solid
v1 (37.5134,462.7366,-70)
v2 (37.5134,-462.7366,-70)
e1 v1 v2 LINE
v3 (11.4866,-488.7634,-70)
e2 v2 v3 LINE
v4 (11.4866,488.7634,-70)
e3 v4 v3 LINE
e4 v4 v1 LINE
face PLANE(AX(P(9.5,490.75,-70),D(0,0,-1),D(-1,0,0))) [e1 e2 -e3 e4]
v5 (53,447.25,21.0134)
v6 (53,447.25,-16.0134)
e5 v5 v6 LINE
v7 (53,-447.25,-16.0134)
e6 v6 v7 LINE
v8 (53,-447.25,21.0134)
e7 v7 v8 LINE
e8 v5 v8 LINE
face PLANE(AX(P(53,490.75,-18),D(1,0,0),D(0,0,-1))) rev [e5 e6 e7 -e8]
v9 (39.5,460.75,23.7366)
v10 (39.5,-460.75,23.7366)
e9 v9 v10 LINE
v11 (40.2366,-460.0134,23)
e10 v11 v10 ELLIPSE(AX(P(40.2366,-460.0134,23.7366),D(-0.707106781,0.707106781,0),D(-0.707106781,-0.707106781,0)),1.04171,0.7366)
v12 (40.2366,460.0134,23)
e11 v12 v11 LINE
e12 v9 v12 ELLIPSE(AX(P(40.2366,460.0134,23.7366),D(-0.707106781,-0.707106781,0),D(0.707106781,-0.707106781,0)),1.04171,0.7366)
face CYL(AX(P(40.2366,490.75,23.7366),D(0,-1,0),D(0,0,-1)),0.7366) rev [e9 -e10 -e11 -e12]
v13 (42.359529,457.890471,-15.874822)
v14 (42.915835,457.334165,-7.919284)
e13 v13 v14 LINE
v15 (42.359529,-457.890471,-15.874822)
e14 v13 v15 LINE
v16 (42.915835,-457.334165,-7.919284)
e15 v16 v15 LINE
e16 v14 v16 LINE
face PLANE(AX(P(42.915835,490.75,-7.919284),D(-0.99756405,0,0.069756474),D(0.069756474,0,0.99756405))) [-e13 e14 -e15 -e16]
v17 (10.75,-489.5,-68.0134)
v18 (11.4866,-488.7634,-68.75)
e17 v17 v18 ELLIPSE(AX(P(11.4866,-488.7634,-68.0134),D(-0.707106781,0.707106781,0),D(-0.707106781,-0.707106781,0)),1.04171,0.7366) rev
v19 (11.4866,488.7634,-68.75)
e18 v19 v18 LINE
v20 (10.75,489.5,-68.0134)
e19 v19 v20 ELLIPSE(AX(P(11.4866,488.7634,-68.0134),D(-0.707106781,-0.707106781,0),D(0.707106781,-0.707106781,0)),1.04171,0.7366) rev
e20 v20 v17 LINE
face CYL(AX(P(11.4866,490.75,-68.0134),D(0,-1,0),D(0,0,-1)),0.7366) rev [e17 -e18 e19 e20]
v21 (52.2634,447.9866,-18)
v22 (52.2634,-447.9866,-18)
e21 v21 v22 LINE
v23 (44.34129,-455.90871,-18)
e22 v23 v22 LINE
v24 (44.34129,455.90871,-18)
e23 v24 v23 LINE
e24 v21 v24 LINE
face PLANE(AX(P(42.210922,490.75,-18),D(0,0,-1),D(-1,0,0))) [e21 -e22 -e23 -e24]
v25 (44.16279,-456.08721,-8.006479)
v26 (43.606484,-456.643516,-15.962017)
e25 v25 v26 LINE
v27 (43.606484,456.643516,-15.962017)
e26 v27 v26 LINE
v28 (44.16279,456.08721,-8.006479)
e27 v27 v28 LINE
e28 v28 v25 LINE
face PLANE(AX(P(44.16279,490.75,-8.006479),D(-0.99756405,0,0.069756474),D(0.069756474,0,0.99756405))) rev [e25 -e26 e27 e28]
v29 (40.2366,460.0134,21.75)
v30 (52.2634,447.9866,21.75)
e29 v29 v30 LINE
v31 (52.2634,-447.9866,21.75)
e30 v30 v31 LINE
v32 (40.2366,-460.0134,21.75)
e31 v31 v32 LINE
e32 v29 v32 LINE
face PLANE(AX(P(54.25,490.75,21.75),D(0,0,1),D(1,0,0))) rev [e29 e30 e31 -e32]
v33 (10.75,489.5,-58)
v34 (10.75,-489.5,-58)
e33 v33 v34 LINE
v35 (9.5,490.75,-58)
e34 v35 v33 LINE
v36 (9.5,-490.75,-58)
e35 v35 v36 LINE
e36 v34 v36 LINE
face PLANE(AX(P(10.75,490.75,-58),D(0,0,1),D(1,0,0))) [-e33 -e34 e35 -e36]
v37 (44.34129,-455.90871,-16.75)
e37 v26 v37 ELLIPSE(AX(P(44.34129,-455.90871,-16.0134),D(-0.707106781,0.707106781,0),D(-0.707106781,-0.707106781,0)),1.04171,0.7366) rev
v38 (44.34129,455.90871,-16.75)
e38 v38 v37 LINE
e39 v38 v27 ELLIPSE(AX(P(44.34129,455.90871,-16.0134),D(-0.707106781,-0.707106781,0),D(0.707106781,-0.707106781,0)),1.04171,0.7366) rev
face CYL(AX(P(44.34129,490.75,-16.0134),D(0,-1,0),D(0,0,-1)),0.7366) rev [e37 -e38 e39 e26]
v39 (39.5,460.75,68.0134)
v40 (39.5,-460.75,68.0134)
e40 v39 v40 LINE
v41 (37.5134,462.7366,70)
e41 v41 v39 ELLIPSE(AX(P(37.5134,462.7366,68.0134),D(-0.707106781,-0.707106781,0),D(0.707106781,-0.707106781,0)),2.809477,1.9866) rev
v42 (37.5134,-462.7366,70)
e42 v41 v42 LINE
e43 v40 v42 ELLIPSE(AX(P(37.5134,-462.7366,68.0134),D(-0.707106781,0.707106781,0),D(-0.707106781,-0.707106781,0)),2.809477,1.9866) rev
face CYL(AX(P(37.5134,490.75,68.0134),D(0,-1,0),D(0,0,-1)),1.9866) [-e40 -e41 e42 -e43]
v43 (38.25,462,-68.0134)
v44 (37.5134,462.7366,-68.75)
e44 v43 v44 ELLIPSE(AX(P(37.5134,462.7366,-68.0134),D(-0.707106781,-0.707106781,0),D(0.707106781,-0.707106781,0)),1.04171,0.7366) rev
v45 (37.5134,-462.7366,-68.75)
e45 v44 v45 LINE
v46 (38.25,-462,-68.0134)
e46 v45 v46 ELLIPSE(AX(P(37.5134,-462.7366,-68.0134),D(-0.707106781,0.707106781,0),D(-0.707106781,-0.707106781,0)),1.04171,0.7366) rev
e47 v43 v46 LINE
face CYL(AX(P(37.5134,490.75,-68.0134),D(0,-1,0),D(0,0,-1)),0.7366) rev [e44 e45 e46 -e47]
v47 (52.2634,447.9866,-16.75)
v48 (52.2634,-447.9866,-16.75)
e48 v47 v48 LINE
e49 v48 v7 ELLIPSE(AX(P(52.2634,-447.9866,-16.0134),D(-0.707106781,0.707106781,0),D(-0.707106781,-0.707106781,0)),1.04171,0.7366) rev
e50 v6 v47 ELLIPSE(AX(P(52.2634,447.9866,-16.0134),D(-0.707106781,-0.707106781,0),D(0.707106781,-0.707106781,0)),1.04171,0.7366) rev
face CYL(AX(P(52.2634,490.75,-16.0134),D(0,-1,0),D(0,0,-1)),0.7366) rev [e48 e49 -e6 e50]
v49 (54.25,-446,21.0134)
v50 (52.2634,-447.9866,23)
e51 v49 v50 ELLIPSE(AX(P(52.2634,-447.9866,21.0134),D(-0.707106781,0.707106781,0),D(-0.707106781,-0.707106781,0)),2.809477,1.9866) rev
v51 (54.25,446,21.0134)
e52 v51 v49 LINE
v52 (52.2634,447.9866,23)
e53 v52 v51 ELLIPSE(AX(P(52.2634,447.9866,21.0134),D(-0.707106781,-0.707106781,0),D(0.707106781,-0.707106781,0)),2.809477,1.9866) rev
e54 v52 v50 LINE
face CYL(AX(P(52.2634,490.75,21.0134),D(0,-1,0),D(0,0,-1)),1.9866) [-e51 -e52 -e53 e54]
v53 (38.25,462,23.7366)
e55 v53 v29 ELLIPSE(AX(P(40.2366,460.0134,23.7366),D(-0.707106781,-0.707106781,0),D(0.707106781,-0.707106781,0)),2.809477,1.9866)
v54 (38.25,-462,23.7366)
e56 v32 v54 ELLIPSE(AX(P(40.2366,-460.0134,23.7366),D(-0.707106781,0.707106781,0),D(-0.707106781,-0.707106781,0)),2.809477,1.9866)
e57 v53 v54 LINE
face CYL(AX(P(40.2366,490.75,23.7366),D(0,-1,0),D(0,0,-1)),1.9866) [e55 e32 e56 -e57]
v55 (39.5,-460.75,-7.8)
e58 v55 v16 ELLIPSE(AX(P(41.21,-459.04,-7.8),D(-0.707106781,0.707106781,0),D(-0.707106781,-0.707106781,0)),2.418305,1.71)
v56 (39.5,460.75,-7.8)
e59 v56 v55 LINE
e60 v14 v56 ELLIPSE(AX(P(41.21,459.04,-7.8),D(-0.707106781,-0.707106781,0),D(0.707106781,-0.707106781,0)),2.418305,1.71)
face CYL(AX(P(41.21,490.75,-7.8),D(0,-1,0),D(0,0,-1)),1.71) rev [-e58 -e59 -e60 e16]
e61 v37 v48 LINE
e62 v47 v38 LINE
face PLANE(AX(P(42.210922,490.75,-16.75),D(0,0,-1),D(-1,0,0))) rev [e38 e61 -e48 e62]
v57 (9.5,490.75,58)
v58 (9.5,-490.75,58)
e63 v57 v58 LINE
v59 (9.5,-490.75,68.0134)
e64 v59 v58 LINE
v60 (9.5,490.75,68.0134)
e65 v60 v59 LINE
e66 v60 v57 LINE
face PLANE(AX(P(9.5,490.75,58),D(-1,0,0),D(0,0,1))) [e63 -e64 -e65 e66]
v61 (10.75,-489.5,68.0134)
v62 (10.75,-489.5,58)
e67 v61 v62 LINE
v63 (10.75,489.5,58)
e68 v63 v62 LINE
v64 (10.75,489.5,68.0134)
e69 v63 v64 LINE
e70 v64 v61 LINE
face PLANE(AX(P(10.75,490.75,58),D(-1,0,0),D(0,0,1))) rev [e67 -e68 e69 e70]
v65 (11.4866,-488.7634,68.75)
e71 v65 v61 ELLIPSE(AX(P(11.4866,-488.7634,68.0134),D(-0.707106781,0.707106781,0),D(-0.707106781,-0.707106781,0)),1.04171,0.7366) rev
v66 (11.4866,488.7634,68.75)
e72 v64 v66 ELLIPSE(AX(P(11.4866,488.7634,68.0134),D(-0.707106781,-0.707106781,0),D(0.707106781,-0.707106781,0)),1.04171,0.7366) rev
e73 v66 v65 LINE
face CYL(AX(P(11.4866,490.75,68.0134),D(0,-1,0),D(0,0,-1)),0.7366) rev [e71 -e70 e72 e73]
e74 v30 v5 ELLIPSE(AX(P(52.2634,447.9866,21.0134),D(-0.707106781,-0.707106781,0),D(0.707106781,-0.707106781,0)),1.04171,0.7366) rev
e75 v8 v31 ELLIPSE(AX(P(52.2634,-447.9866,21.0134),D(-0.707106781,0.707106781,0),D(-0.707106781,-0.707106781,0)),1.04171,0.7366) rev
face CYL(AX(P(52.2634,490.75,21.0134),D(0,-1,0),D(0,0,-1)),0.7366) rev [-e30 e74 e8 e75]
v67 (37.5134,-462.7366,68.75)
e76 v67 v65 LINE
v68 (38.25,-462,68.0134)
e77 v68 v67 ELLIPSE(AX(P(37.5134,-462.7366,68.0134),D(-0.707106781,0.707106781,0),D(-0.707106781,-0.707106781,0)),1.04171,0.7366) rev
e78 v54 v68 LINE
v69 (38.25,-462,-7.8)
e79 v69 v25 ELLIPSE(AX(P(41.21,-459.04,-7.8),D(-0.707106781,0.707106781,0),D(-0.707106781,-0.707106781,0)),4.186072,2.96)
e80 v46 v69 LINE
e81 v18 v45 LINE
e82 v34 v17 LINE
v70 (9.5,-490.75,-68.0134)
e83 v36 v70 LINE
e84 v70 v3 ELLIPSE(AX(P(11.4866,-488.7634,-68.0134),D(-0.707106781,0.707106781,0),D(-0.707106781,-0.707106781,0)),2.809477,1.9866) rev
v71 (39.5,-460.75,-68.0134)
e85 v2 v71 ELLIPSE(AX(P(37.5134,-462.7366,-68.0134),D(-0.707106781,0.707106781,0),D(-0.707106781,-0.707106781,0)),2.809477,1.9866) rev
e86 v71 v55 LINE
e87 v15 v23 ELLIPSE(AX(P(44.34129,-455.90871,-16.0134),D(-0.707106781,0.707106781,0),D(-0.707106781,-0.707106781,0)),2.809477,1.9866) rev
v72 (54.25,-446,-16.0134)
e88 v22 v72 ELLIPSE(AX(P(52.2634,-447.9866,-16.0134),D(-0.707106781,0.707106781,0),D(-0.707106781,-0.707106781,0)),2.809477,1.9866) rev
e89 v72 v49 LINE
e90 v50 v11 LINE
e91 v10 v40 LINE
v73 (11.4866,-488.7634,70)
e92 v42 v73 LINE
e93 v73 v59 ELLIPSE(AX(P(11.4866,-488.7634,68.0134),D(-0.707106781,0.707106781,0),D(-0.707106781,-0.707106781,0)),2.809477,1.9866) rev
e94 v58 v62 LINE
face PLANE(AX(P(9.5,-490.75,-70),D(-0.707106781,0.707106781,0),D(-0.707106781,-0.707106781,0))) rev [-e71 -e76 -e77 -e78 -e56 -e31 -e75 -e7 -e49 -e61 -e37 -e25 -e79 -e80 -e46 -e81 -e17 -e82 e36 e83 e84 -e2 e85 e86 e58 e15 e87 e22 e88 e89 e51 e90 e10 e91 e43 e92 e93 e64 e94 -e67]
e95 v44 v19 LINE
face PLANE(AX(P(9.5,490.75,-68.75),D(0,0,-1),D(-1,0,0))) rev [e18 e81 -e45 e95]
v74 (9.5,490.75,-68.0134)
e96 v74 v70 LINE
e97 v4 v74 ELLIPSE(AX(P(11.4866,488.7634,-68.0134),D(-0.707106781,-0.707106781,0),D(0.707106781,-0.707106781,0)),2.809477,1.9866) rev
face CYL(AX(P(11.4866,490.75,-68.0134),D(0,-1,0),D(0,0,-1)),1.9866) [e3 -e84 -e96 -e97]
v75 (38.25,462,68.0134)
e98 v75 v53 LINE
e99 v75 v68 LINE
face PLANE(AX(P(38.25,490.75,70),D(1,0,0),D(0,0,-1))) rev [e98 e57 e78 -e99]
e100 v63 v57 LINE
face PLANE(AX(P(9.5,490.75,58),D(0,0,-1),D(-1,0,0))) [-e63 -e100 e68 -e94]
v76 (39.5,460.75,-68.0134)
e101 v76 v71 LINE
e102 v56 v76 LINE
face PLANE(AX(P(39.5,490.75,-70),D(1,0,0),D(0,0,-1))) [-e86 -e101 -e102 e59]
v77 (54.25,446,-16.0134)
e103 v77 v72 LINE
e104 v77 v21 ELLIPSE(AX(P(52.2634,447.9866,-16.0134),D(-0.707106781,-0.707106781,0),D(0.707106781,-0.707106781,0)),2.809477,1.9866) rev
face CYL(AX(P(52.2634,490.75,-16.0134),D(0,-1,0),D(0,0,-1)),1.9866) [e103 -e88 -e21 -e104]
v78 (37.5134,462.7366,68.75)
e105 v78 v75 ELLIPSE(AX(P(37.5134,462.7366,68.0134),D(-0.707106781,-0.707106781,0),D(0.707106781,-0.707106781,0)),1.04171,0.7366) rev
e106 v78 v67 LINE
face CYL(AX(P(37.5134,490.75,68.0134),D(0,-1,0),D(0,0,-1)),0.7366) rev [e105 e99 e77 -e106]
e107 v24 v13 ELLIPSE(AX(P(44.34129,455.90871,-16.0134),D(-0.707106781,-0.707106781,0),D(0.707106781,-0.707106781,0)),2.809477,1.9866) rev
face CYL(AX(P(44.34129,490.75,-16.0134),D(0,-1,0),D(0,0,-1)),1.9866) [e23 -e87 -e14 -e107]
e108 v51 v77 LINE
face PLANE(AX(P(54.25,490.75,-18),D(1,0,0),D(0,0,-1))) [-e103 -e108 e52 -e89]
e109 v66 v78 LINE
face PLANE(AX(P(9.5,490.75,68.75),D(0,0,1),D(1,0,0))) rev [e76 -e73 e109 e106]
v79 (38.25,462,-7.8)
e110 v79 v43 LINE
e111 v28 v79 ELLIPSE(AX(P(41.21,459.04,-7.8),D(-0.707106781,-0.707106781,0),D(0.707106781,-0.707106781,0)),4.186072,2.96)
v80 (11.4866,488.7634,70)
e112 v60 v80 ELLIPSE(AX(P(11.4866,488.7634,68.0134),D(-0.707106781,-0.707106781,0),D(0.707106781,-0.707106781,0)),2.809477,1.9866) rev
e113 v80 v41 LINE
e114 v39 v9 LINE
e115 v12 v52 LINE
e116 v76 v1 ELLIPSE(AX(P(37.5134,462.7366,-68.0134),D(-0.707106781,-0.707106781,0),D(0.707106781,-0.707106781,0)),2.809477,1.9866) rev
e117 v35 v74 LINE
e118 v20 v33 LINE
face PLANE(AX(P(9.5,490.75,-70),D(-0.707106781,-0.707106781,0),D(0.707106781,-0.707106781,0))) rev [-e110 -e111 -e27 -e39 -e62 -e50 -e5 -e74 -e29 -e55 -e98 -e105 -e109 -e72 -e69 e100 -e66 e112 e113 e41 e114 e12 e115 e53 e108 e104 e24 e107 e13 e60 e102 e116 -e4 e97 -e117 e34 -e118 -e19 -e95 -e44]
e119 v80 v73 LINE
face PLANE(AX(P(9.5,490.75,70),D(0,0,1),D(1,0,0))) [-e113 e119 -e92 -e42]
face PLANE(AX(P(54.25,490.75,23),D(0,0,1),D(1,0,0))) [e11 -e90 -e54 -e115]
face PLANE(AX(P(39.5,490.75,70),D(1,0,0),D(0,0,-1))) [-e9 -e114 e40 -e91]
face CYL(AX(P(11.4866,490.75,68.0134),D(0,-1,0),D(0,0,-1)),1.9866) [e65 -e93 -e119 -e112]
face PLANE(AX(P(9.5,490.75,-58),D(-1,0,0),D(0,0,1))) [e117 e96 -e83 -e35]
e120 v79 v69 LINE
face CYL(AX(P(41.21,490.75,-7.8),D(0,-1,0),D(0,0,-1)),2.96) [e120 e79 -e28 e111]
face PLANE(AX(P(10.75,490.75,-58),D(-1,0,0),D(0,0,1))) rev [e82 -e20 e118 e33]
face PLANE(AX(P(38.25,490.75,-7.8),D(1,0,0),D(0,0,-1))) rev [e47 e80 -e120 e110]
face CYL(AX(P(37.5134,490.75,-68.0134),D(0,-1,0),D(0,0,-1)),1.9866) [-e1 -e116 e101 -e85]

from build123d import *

# Parameters (mm, degrees)
BASE_FLANGE1_DEPTH = 490.75
CUT_EXTRUDE2_DEPTH = 514.204272196


# Sheet-metal steps are written as plain solids
with BuildPart() as part:
    # Sketch1 → Base-Flange1 (new, symmetric)
    with BuildSketch(Plane(origin=(0, 0, 0), x_dir=(1, 0, 0), z_dir=(0, 1, 0))):
        with BuildLine():
            Line((9.5, 58), (9.5, 68.0134))
            ThreePointArc((9.5, 68.0134), (10.081861668, 69.418138332), (11.4866, 70))
            Line((11.4866, 70), (37.5134, 70))
            ThreePointArc((37.5134, 70), (38.918138332, 69.418138332), (39.5, 68.0134))
            Line((39.5, 68.0134), (39.5, 23))
            Line((39.5, 23), (39.5, 18))
            Line((39.5, 18), (39.5, 7.8))
            ThreePointArc((39.5, 7.8), (41.269678139, 6.091041686), (42.915834526, 7.91928357))
            Line((42.915834526, 7.91928357), (42.359529101, 15.874821789))
            ThreePointArc((42.359529101, 15.874821789), (42.88838258, 17.368257942), (44.341289843, 18))
            Line((44.341289843, 18), (52.2634, 18))
            ThreePointArc((52.2634, 18), (53.668138332, 17.418138332), (54.25, 16.0134))
            Line((54.25, 16.0134), (54.25, -21.0134))
            ThreePointArc((54.25, -21.0134), (53.668138332, -22.418138332), (52.2634, -23))
            Line((52.2634, -23), (40.2366, -23))
            ThreePointArc((40.2366, -23), (39.715745145, -23.215745145), (39.5, -23.7366))
            Line((39.5, -23.7366), (39.5, -68.0134))
            ThreePointArc((39.5, -68.0134), (38.918138332, -69.418138332), (37.5134, -70))
            Line((37.5134, -70), (11.4866, -70))
            ThreePointArc((11.4866, -70), (10.081861668, -69.418138332), (9.5, -68.0134))
            Line((9.5, -68.0134), (9.5, -58))
            Line((9.5, -58), (10.75, -58))
            Line((10.75, -58), (10.75, -68.0134))
            ThreePointArc((10.75, -68.0134), (10.965745145, -68.534254855), (11.4866, -68.75))
            Line((11.4866, -68.75), (37.5134, -68.75))
            ThreePointArc((37.5134, -68.75), (38.034254855, -68.534254855), (38.25, -68.0134))
            Line((38.25, -68.0134), (38.25, -23.7366))
            ThreePointArc((38.25, -23.7366), (38.831861668, -22.331861668), (40.2366, -21.75))
            Line((40.2366, -21.75), (52.2634, -21.75))
            ThreePointArc((52.2634, -21.75), (52.784254855, -21.534254855), (53, -21.0134))
            Line((53, -21.0134), (53, 16.0134))
            ThreePointArc((53, 16.0134), (52.784254855, 16.534254855), (52.2634, 16.75))
            Line((52.2634, 16.75), (44.341289843, 16.75))
            ThreePointArc((44.341289843, 16.75), (43.802574707, 16.515759992), (43.606484164, 15.962017381))
            Line((43.606484164, 15.962017381), (44.162789589, 8.006479162))
            ThreePointArc((44.162789589, 8.006479162), (41.31330251, 4.841803152), (38.25, 7.8))
            Line((38.25, 7.8), (38.25, 18))
            Line((38.25, 18), (38.25, 23))
            Line((38.25, 23), (38.25, 68.0134))
            ThreePointArc((38.25, 68.0134), (38.034254855, 68.534254855), (37.5134, 68.75))
            Line((37.5134, 68.75), (11.4866, 68.75))
            ThreePointArc((11.4866, 68.75), (10.965745145, 68.534254855), (10.75, 68.0134))
            Line((10.75, 68.0134), (10.75, 58))
            Line((10.75, 58), (9.5, 58))
        make_face()
    extrude(amount=BASE_FLANGE1_DEPTH, both=True)

    # Sketch2 → Cut-Extrude2 (cut, through all)
    with BuildSketch(Plane.XY.offset(70)):
        Polygon((9.5, -490.75), (246.796446659, -253.453553341), (123.087268974, -490.75), align=None)
        Polygon((123.087268974, 490.75), (9.5, 490.75), (246.796446659, 253.453553341), align=None)
    extrude(amount=-CUT_EXTRUDE2_DEPTH, mode=Mode.SUBTRACT)


solid = part.part
